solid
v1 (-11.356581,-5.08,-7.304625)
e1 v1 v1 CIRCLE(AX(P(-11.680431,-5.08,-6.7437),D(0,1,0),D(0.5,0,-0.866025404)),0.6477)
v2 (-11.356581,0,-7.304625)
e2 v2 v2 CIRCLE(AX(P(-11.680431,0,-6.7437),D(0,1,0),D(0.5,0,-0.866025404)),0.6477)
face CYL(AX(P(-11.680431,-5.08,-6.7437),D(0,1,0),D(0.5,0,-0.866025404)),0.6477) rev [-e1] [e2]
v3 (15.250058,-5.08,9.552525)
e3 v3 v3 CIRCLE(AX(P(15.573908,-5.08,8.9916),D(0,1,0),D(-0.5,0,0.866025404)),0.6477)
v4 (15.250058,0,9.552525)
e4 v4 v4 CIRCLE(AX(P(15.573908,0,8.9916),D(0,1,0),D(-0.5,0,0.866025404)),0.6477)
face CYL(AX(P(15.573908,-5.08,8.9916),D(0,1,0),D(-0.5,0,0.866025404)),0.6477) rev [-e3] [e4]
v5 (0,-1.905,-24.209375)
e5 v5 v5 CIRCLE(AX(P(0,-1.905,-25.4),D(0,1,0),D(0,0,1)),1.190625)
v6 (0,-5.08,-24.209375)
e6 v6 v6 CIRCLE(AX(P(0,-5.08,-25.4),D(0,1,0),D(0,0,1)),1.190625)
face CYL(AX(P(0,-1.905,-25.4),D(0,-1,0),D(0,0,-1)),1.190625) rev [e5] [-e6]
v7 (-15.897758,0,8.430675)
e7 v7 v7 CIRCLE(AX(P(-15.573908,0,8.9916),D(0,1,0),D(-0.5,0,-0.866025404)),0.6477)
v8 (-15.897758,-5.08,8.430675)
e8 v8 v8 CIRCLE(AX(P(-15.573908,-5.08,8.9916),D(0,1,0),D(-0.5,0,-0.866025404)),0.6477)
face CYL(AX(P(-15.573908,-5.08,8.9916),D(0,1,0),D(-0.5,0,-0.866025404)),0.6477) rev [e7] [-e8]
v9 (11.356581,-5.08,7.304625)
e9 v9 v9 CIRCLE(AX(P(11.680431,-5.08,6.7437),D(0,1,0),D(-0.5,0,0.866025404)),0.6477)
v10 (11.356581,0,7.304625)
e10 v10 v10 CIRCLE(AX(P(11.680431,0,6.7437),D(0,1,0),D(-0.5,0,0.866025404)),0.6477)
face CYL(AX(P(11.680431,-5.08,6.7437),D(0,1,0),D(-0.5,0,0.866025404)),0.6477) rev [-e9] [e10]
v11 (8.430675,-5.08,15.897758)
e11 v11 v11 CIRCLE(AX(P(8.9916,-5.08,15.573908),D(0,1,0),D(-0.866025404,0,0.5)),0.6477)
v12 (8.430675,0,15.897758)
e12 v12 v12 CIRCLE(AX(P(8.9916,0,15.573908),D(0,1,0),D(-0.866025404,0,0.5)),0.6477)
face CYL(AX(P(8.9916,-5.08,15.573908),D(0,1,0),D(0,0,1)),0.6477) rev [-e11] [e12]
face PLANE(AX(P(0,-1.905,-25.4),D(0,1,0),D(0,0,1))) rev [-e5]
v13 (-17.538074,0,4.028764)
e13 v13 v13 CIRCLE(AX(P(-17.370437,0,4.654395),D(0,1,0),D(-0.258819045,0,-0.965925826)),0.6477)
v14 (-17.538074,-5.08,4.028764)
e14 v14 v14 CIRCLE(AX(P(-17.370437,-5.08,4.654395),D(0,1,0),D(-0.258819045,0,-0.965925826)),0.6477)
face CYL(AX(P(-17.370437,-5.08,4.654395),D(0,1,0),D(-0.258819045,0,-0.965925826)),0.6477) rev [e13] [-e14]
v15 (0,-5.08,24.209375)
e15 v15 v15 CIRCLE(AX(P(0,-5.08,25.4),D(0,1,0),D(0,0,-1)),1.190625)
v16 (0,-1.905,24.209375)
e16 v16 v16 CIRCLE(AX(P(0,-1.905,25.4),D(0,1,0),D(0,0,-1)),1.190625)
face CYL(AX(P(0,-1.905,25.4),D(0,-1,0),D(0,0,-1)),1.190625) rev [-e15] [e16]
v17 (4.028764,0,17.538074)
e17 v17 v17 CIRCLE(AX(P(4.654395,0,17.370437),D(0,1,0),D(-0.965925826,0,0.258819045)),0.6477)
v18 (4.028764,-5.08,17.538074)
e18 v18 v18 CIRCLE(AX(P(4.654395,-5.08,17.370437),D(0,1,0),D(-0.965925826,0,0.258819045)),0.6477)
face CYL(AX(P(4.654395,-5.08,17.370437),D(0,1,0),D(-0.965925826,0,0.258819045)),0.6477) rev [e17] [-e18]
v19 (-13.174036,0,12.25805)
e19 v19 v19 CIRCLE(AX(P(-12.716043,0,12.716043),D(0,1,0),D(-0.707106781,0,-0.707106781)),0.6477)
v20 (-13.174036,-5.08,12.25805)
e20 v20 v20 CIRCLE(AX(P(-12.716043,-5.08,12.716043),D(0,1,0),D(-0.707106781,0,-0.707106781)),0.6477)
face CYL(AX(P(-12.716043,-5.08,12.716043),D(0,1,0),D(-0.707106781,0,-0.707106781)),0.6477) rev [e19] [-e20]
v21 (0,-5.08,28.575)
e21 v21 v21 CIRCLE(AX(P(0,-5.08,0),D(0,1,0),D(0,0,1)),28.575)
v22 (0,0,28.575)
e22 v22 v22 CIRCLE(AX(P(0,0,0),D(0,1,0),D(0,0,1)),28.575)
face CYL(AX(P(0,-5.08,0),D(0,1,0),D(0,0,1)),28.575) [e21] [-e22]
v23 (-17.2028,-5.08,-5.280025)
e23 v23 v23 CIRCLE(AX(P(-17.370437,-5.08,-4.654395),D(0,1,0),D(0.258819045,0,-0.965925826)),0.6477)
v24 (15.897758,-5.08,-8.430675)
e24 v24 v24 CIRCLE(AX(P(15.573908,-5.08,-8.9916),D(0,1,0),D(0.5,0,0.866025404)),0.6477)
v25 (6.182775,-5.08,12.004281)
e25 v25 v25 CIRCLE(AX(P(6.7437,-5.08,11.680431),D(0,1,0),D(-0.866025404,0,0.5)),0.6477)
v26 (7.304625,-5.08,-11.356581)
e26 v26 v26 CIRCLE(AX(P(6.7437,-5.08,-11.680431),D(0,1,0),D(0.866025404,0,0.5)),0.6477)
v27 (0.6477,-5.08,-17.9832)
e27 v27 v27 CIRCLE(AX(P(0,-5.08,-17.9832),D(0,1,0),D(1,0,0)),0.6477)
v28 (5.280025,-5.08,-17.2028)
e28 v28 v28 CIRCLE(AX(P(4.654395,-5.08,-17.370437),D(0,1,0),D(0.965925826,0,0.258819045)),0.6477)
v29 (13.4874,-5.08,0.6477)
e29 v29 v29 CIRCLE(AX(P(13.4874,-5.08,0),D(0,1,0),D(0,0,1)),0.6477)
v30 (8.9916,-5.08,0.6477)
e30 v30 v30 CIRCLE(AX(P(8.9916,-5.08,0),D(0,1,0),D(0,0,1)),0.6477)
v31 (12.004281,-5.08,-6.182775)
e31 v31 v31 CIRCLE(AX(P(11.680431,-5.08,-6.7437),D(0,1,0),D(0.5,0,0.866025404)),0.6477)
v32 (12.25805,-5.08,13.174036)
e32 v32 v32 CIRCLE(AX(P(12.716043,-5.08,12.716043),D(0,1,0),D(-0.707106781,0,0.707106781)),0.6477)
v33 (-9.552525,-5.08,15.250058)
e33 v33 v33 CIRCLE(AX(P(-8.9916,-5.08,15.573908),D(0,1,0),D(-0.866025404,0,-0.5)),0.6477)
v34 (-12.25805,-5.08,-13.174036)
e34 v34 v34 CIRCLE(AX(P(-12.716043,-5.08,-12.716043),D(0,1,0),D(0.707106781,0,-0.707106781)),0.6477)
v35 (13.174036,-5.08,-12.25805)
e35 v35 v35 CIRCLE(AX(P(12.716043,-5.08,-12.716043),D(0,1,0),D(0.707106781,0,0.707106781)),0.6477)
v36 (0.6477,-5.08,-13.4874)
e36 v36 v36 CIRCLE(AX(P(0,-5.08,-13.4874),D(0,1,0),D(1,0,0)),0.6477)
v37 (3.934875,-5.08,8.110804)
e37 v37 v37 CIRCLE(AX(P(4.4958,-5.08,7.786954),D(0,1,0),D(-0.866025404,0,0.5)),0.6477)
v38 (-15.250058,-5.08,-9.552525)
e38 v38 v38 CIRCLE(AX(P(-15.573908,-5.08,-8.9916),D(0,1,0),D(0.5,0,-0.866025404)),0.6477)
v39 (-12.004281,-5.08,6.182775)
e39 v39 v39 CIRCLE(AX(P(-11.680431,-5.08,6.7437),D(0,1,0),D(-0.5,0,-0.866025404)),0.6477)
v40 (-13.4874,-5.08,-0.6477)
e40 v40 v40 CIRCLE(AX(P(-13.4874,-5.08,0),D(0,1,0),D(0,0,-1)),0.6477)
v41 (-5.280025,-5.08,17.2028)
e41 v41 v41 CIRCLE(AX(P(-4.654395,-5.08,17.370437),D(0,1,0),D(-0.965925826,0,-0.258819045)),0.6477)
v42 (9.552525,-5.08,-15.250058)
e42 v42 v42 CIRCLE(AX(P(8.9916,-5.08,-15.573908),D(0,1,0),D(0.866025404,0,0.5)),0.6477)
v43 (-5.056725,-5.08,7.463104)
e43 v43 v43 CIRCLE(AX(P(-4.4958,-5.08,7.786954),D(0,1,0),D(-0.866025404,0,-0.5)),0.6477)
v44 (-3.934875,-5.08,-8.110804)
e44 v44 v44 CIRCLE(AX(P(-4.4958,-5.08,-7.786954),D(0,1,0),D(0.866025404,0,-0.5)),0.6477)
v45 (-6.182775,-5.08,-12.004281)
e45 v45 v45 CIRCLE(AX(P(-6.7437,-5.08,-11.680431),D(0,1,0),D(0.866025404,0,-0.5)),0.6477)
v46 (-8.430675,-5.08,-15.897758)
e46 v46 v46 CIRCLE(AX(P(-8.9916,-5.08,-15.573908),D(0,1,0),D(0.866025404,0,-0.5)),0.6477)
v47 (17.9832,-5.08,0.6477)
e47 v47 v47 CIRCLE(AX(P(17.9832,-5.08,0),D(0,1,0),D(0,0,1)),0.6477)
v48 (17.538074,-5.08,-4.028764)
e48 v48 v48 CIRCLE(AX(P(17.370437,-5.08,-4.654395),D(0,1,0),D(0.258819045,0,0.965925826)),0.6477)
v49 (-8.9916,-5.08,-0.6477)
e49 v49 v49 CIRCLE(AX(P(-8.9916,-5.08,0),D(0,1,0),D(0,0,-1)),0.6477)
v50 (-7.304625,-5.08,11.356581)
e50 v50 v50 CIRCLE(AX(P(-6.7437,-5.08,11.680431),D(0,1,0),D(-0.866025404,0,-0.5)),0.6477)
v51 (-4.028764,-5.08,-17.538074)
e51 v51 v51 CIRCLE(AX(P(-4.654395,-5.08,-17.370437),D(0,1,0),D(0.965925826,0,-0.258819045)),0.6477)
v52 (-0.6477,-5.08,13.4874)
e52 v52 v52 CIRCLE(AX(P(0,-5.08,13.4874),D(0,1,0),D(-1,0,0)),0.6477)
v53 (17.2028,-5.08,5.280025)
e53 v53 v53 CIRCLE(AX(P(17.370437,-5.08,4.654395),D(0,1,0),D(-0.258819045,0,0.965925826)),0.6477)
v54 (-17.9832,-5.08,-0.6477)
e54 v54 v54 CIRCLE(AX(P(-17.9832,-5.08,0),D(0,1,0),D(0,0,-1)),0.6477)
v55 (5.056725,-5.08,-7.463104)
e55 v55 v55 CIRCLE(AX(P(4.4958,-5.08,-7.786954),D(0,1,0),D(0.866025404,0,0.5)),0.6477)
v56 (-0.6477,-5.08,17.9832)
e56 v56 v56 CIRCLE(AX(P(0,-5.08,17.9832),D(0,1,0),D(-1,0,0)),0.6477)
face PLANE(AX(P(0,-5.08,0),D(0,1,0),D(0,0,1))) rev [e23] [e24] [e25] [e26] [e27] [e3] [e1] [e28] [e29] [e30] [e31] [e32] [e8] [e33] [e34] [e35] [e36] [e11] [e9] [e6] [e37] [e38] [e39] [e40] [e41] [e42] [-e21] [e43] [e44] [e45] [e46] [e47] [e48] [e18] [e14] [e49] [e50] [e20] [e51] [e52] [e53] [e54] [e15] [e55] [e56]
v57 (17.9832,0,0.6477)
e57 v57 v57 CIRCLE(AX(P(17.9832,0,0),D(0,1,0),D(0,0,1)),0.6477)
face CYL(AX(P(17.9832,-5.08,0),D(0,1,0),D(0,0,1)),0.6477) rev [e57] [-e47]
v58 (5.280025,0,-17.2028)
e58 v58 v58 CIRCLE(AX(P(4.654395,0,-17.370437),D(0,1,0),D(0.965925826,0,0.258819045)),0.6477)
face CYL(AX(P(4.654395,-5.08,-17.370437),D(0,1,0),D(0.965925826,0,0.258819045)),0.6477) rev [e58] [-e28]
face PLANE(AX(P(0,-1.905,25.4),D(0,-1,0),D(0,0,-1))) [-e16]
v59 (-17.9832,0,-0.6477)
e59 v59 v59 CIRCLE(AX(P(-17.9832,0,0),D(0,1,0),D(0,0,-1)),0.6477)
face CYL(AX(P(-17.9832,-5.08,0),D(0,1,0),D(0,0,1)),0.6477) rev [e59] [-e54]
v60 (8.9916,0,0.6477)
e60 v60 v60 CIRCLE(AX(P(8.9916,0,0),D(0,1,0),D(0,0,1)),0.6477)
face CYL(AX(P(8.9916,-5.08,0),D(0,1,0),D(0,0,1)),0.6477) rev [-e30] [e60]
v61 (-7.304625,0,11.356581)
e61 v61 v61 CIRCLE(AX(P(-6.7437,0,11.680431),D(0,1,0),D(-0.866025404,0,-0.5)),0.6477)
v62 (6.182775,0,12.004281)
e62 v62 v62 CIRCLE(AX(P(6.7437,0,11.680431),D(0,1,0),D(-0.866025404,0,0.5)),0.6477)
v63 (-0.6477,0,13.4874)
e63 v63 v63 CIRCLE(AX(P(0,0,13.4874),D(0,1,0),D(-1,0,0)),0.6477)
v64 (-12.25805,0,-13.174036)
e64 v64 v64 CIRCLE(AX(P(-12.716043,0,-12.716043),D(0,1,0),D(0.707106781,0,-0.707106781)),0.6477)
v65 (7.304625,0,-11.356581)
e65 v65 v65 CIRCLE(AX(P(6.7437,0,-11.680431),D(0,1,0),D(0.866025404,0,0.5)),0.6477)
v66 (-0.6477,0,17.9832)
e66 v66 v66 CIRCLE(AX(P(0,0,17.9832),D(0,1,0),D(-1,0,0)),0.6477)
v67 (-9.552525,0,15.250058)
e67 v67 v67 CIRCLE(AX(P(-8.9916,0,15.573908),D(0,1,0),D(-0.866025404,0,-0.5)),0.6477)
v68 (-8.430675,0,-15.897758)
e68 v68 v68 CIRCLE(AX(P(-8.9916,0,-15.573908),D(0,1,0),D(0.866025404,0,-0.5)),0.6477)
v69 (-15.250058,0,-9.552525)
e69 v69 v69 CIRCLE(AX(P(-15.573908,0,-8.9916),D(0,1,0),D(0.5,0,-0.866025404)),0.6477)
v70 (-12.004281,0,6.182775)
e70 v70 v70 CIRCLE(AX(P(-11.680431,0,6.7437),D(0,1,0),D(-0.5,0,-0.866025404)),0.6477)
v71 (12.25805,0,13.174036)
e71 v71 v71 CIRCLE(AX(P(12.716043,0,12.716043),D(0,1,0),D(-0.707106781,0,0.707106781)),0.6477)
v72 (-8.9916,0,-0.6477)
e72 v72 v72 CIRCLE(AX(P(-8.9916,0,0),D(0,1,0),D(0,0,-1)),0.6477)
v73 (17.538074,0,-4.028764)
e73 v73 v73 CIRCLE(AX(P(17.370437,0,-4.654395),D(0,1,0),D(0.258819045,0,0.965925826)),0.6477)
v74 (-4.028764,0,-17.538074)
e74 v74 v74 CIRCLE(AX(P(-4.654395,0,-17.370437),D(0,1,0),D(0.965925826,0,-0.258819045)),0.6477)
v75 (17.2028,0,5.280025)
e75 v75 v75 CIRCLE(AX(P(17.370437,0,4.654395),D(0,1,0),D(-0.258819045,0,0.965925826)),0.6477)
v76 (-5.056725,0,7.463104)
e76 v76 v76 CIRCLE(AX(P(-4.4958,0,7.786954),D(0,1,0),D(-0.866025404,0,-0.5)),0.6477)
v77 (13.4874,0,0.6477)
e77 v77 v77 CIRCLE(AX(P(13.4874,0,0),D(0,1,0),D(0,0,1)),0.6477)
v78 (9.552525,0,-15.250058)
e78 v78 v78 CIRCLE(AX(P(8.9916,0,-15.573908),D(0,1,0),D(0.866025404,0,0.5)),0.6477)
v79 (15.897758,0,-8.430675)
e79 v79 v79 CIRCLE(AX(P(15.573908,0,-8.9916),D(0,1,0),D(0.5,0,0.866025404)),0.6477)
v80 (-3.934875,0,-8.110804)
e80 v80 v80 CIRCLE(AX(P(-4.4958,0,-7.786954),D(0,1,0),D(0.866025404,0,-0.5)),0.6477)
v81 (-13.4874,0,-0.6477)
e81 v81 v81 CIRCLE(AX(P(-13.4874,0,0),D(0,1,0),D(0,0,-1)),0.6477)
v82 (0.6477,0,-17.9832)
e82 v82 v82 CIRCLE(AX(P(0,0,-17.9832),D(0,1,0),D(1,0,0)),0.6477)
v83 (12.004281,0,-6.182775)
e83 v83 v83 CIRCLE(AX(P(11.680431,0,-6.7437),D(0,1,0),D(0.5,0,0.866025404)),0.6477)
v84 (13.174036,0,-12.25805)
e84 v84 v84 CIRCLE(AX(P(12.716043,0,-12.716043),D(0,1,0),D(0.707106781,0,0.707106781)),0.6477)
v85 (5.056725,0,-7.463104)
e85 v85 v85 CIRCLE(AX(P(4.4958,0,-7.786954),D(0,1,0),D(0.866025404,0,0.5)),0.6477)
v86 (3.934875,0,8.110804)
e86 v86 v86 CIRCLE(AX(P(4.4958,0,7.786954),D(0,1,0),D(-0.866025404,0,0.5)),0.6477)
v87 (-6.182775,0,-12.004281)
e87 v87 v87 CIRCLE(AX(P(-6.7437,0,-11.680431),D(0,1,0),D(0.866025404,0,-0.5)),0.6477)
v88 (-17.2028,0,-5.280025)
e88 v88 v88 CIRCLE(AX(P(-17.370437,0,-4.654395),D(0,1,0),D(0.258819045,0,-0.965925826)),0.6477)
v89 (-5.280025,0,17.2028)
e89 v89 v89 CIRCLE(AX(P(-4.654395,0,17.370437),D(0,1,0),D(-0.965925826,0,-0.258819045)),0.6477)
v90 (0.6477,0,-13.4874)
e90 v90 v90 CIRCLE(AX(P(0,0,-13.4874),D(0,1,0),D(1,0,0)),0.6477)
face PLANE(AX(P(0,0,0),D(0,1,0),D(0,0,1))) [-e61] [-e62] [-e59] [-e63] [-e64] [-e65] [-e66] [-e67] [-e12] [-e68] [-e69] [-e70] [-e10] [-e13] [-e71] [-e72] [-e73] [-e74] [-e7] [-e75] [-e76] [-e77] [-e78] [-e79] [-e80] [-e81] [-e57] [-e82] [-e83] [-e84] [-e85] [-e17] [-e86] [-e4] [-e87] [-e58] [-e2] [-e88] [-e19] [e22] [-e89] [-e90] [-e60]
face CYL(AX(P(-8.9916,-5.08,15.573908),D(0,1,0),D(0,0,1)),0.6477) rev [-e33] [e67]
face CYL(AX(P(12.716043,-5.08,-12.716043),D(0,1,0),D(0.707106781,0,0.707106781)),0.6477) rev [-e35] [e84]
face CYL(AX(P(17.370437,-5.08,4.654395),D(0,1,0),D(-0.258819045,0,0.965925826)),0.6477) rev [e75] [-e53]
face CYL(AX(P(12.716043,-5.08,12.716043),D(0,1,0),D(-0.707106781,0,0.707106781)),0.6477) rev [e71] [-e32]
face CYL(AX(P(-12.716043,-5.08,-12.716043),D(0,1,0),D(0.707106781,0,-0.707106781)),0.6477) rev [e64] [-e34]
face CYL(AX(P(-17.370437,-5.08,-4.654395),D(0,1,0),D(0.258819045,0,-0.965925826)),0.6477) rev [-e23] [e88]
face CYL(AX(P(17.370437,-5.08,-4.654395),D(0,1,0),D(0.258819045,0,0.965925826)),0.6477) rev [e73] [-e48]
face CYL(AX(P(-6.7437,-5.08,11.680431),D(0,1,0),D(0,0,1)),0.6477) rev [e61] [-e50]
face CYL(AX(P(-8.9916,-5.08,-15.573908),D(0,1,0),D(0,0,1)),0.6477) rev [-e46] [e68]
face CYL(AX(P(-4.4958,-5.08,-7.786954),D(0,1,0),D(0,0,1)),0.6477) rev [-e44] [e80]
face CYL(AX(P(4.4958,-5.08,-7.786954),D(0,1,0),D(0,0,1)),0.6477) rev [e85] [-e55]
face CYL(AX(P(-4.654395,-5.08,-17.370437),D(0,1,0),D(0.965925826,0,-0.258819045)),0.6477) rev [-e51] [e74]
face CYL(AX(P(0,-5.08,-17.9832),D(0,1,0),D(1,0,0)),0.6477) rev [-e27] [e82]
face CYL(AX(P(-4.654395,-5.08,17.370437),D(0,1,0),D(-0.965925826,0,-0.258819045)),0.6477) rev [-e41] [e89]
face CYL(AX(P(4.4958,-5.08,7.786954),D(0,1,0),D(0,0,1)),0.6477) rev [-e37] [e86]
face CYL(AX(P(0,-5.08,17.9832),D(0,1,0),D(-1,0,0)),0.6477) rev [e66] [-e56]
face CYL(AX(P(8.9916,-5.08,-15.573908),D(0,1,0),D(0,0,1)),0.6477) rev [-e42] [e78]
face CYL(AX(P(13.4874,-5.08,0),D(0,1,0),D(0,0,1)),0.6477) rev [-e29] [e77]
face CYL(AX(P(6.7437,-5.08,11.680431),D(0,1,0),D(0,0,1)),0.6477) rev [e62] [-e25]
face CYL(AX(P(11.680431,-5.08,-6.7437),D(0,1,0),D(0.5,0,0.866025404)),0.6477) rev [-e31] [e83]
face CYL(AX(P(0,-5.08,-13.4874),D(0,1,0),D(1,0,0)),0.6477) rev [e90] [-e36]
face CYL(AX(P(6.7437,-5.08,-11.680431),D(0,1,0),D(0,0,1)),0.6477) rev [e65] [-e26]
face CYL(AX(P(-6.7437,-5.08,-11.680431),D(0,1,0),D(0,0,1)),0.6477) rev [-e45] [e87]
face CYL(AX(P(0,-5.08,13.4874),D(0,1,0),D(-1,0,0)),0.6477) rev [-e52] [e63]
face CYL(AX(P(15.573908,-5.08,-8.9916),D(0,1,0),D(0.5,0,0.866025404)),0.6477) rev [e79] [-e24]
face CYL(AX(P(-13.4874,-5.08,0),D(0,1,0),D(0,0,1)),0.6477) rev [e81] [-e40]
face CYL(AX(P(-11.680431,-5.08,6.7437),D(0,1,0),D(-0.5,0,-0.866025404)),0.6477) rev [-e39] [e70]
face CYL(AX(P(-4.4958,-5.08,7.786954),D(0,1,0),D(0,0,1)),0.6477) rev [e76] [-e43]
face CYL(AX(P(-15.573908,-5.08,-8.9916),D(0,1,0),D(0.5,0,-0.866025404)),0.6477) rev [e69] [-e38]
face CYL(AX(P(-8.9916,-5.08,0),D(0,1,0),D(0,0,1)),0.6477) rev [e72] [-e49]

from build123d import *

# Parameters (mm, degrees)
SKETCH1_R             = 28.575
BILLET_DEPTH          = 5.08
SKETCH2_R             = 0.6477
FIRST_LOX_HOLE_DEPTH  = 41.729198985
CIRPATTERN1_COUNT     = 6
CIRPATTERN2_START     = -5.08
CIRPATTERN2_OUTLINE_R = 0.6477
CIRPATTERN2_DEPTH     = 5.08
CIRPATTERN3_START     = -5.08
CIRPATTERN3_OUTLINE_R = 0.6477
CIRPATTERN3_DEPTH     = 5.08
SKETCH4_R             = 1.190625
DOWEL_DEPTH           = 3.175


# Read off the part's stored shape, not the designer's step: CirPattern2, CirPattern3
with BuildPart() as part:
    # Sketch1 → Billet (new body)
    with BuildSketch(Plane(origin=(0, 0, 0), x_dir=(1, 0, 0), z_dir=(0, 1, 0))):
        with Locations(Location((0, 0, 0), (0, 0, 270))):
            Circle(SKETCH1_R)
    extrude(amount=-BILLET_DEPTH)

    # Sketch2 → First Lox Hole (cut, through all)
    with BuildSketch(Plane(origin=(0, 0, 0), x_dir=(1, 0, 0), z_dir=(0, 1, 0))):
        with Locations(Location((8.9916, 0, 0), (0, 0, 270))):
            Circle(SKETCH2_R)
        with Locations(Location((13.4874, 0, 0), (0, 0, 270))):
            Circle(SKETCH2_R)
        with Locations(Location((17.9832, 0, 0), (0, 0, 270))):
            Circle(SKETCH2_R)
    first_lox_hole = extrude(amount=-FIRST_LOX_HOLE_DEPTH, mode=Mode.SUBTRACT)

    # CirPattern1: First Lox Hole ×6 about axis
    cirpattern1_axis = Axis((0, 0, 0), (0, 1, 0))
    for i in range(1, CIRPATTERN1_COUNT):
        add(first_lox_hole.rotate(cirpattern1_axis, i * 360 / CIRPATTERN1_COUNT), mode=Mode.SUBTRACT)

    # CirPattern2 outline → CirPattern2 (cut)
    with BuildSketch(Plane(origin=(0, 0, 0), x_dir=(1, 0, 0), z_dir=(0, 1, 0)).offset(CIRPATTERN2_START)):
        with Locations((11.680431031, -6.7437)):
            Circle(CIRPATTERN2_OUTLINE_R)
        with Locations((0, -13.4874)):
            Circle(CIRPATTERN2_OUTLINE_R)
        with Locations((-11.680431031, -6.7437)):
            Circle(CIRPATTERN2_OUTLINE_R)
        with Locations((-11.680431031, 6.7437)):
            Circle(CIRPATTERN2_OUTLINE_R)
        with Locations((0, 13.4874)):
            Circle(CIRPATTERN2_OUTLINE_R)
        with Locations((11.680431031, 6.7437)):
            Circle(CIRPATTERN2_OUTLINE_R)
    extrude(amount=CIRPATTERN2_DEPTH, mode=Mode.SUBTRACT)

    # CirPattern3 outline → CirPattern3 (cut)
    with BuildSketch(Plane(origin=(0, 0, 0), x_dir=(1, 0, 0), z_dir=(0, 1, 0)).offset(CIRPATTERN3_START)):
        with Locations((17.370437319, -4.654394652)):
            Circle(CIRPATTERN3_OUTLINE_R)
        with Locations((15.573908041, -8.9916)):
            Circle(CIRPATTERN3_OUTLINE_R)
        with Locations((12.716042667, -12.716042667)):
            Circle(CIRPATTERN3_OUTLINE_R)
        with Locations((4.654394652, -17.370437319)):
            Circle(CIRPATTERN3_OUTLINE_R)
        with Locations((0, -17.9832)):
            Circle(CIRPATTERN3_OUTLINE_R)
        with Locations((-4.654394652, -17.370437319)):
            Circle(CIRPATTERN3_OUTLINE_R)
        with Locations((-12.716042667, -12.716042667)):
            Circle(CIRPATTERN3_OUTLINE_R)
        with Locations((-15.573908041, -8.9916)):
            Circle(CIRPATTERN3_OUTLINE_R)
        with Locations((-17.370437319, -4.654394652)):
            Circle(CIRPATTERN3_OUTLINE_R)
        with Locations((-17.370437319, 4.654394652)):
            Circle(CIRPATTERN3_OUTLINE_R)
        with Locations((-15.573908041, 8.9916)):
            Circle(CIRPATTERN3_OUTLINE_R)
        with Locations((-12.716042667, 12.716042667)):
            Circle(CIRPATTERN3_OUTLINE_R)
        with Locations((-4.654394652, 17.370437319)):
            Circle(CIRPATTERN3_OUTLINE_R)
        with Locations((0, 17.9832)):
            Circle(CIRPATTERN3_OUTLINE_R)
        with Locations((4.654394652, 17.370437319)):
            Circle(CIRPATTERN3_OUTLINE_R)
        with Locations((12.716042667, 12.716042667)):
            Circle(CIRPATTERN3_OUTLINE_R)
        with Locations((15.573908041, 8.9916)):
            Circle(CIRPATTERN3_OUTLINE_R)
        with Locations((17.370437319, 4.654394652)):
            Circle(CIRPATTERN3_OUTLINE_R)
    extrude(amount=CIRPATTERN3_DEPTH, mode=Mode.SUBTRACT)

    # Sketch4 → Dowel (cut)
    with BuildSketch(Plane(origin=(0, -5.08, 0), x_dir=(1, 0, 0), z_dir=(0, 1, 0))):
        with Locations(Location((0, 25.4, 0), (0, 0, 270))):
            Circle(SKETCH4_R)
        with Locations(Location((0, -25.4, 0), (0, 0, 90))):
            Circle(SKETCH4_R)
    extrude(amount=DOWEL_DEPTH, mode=Mode.SUBTRACT)


solid = part.part
